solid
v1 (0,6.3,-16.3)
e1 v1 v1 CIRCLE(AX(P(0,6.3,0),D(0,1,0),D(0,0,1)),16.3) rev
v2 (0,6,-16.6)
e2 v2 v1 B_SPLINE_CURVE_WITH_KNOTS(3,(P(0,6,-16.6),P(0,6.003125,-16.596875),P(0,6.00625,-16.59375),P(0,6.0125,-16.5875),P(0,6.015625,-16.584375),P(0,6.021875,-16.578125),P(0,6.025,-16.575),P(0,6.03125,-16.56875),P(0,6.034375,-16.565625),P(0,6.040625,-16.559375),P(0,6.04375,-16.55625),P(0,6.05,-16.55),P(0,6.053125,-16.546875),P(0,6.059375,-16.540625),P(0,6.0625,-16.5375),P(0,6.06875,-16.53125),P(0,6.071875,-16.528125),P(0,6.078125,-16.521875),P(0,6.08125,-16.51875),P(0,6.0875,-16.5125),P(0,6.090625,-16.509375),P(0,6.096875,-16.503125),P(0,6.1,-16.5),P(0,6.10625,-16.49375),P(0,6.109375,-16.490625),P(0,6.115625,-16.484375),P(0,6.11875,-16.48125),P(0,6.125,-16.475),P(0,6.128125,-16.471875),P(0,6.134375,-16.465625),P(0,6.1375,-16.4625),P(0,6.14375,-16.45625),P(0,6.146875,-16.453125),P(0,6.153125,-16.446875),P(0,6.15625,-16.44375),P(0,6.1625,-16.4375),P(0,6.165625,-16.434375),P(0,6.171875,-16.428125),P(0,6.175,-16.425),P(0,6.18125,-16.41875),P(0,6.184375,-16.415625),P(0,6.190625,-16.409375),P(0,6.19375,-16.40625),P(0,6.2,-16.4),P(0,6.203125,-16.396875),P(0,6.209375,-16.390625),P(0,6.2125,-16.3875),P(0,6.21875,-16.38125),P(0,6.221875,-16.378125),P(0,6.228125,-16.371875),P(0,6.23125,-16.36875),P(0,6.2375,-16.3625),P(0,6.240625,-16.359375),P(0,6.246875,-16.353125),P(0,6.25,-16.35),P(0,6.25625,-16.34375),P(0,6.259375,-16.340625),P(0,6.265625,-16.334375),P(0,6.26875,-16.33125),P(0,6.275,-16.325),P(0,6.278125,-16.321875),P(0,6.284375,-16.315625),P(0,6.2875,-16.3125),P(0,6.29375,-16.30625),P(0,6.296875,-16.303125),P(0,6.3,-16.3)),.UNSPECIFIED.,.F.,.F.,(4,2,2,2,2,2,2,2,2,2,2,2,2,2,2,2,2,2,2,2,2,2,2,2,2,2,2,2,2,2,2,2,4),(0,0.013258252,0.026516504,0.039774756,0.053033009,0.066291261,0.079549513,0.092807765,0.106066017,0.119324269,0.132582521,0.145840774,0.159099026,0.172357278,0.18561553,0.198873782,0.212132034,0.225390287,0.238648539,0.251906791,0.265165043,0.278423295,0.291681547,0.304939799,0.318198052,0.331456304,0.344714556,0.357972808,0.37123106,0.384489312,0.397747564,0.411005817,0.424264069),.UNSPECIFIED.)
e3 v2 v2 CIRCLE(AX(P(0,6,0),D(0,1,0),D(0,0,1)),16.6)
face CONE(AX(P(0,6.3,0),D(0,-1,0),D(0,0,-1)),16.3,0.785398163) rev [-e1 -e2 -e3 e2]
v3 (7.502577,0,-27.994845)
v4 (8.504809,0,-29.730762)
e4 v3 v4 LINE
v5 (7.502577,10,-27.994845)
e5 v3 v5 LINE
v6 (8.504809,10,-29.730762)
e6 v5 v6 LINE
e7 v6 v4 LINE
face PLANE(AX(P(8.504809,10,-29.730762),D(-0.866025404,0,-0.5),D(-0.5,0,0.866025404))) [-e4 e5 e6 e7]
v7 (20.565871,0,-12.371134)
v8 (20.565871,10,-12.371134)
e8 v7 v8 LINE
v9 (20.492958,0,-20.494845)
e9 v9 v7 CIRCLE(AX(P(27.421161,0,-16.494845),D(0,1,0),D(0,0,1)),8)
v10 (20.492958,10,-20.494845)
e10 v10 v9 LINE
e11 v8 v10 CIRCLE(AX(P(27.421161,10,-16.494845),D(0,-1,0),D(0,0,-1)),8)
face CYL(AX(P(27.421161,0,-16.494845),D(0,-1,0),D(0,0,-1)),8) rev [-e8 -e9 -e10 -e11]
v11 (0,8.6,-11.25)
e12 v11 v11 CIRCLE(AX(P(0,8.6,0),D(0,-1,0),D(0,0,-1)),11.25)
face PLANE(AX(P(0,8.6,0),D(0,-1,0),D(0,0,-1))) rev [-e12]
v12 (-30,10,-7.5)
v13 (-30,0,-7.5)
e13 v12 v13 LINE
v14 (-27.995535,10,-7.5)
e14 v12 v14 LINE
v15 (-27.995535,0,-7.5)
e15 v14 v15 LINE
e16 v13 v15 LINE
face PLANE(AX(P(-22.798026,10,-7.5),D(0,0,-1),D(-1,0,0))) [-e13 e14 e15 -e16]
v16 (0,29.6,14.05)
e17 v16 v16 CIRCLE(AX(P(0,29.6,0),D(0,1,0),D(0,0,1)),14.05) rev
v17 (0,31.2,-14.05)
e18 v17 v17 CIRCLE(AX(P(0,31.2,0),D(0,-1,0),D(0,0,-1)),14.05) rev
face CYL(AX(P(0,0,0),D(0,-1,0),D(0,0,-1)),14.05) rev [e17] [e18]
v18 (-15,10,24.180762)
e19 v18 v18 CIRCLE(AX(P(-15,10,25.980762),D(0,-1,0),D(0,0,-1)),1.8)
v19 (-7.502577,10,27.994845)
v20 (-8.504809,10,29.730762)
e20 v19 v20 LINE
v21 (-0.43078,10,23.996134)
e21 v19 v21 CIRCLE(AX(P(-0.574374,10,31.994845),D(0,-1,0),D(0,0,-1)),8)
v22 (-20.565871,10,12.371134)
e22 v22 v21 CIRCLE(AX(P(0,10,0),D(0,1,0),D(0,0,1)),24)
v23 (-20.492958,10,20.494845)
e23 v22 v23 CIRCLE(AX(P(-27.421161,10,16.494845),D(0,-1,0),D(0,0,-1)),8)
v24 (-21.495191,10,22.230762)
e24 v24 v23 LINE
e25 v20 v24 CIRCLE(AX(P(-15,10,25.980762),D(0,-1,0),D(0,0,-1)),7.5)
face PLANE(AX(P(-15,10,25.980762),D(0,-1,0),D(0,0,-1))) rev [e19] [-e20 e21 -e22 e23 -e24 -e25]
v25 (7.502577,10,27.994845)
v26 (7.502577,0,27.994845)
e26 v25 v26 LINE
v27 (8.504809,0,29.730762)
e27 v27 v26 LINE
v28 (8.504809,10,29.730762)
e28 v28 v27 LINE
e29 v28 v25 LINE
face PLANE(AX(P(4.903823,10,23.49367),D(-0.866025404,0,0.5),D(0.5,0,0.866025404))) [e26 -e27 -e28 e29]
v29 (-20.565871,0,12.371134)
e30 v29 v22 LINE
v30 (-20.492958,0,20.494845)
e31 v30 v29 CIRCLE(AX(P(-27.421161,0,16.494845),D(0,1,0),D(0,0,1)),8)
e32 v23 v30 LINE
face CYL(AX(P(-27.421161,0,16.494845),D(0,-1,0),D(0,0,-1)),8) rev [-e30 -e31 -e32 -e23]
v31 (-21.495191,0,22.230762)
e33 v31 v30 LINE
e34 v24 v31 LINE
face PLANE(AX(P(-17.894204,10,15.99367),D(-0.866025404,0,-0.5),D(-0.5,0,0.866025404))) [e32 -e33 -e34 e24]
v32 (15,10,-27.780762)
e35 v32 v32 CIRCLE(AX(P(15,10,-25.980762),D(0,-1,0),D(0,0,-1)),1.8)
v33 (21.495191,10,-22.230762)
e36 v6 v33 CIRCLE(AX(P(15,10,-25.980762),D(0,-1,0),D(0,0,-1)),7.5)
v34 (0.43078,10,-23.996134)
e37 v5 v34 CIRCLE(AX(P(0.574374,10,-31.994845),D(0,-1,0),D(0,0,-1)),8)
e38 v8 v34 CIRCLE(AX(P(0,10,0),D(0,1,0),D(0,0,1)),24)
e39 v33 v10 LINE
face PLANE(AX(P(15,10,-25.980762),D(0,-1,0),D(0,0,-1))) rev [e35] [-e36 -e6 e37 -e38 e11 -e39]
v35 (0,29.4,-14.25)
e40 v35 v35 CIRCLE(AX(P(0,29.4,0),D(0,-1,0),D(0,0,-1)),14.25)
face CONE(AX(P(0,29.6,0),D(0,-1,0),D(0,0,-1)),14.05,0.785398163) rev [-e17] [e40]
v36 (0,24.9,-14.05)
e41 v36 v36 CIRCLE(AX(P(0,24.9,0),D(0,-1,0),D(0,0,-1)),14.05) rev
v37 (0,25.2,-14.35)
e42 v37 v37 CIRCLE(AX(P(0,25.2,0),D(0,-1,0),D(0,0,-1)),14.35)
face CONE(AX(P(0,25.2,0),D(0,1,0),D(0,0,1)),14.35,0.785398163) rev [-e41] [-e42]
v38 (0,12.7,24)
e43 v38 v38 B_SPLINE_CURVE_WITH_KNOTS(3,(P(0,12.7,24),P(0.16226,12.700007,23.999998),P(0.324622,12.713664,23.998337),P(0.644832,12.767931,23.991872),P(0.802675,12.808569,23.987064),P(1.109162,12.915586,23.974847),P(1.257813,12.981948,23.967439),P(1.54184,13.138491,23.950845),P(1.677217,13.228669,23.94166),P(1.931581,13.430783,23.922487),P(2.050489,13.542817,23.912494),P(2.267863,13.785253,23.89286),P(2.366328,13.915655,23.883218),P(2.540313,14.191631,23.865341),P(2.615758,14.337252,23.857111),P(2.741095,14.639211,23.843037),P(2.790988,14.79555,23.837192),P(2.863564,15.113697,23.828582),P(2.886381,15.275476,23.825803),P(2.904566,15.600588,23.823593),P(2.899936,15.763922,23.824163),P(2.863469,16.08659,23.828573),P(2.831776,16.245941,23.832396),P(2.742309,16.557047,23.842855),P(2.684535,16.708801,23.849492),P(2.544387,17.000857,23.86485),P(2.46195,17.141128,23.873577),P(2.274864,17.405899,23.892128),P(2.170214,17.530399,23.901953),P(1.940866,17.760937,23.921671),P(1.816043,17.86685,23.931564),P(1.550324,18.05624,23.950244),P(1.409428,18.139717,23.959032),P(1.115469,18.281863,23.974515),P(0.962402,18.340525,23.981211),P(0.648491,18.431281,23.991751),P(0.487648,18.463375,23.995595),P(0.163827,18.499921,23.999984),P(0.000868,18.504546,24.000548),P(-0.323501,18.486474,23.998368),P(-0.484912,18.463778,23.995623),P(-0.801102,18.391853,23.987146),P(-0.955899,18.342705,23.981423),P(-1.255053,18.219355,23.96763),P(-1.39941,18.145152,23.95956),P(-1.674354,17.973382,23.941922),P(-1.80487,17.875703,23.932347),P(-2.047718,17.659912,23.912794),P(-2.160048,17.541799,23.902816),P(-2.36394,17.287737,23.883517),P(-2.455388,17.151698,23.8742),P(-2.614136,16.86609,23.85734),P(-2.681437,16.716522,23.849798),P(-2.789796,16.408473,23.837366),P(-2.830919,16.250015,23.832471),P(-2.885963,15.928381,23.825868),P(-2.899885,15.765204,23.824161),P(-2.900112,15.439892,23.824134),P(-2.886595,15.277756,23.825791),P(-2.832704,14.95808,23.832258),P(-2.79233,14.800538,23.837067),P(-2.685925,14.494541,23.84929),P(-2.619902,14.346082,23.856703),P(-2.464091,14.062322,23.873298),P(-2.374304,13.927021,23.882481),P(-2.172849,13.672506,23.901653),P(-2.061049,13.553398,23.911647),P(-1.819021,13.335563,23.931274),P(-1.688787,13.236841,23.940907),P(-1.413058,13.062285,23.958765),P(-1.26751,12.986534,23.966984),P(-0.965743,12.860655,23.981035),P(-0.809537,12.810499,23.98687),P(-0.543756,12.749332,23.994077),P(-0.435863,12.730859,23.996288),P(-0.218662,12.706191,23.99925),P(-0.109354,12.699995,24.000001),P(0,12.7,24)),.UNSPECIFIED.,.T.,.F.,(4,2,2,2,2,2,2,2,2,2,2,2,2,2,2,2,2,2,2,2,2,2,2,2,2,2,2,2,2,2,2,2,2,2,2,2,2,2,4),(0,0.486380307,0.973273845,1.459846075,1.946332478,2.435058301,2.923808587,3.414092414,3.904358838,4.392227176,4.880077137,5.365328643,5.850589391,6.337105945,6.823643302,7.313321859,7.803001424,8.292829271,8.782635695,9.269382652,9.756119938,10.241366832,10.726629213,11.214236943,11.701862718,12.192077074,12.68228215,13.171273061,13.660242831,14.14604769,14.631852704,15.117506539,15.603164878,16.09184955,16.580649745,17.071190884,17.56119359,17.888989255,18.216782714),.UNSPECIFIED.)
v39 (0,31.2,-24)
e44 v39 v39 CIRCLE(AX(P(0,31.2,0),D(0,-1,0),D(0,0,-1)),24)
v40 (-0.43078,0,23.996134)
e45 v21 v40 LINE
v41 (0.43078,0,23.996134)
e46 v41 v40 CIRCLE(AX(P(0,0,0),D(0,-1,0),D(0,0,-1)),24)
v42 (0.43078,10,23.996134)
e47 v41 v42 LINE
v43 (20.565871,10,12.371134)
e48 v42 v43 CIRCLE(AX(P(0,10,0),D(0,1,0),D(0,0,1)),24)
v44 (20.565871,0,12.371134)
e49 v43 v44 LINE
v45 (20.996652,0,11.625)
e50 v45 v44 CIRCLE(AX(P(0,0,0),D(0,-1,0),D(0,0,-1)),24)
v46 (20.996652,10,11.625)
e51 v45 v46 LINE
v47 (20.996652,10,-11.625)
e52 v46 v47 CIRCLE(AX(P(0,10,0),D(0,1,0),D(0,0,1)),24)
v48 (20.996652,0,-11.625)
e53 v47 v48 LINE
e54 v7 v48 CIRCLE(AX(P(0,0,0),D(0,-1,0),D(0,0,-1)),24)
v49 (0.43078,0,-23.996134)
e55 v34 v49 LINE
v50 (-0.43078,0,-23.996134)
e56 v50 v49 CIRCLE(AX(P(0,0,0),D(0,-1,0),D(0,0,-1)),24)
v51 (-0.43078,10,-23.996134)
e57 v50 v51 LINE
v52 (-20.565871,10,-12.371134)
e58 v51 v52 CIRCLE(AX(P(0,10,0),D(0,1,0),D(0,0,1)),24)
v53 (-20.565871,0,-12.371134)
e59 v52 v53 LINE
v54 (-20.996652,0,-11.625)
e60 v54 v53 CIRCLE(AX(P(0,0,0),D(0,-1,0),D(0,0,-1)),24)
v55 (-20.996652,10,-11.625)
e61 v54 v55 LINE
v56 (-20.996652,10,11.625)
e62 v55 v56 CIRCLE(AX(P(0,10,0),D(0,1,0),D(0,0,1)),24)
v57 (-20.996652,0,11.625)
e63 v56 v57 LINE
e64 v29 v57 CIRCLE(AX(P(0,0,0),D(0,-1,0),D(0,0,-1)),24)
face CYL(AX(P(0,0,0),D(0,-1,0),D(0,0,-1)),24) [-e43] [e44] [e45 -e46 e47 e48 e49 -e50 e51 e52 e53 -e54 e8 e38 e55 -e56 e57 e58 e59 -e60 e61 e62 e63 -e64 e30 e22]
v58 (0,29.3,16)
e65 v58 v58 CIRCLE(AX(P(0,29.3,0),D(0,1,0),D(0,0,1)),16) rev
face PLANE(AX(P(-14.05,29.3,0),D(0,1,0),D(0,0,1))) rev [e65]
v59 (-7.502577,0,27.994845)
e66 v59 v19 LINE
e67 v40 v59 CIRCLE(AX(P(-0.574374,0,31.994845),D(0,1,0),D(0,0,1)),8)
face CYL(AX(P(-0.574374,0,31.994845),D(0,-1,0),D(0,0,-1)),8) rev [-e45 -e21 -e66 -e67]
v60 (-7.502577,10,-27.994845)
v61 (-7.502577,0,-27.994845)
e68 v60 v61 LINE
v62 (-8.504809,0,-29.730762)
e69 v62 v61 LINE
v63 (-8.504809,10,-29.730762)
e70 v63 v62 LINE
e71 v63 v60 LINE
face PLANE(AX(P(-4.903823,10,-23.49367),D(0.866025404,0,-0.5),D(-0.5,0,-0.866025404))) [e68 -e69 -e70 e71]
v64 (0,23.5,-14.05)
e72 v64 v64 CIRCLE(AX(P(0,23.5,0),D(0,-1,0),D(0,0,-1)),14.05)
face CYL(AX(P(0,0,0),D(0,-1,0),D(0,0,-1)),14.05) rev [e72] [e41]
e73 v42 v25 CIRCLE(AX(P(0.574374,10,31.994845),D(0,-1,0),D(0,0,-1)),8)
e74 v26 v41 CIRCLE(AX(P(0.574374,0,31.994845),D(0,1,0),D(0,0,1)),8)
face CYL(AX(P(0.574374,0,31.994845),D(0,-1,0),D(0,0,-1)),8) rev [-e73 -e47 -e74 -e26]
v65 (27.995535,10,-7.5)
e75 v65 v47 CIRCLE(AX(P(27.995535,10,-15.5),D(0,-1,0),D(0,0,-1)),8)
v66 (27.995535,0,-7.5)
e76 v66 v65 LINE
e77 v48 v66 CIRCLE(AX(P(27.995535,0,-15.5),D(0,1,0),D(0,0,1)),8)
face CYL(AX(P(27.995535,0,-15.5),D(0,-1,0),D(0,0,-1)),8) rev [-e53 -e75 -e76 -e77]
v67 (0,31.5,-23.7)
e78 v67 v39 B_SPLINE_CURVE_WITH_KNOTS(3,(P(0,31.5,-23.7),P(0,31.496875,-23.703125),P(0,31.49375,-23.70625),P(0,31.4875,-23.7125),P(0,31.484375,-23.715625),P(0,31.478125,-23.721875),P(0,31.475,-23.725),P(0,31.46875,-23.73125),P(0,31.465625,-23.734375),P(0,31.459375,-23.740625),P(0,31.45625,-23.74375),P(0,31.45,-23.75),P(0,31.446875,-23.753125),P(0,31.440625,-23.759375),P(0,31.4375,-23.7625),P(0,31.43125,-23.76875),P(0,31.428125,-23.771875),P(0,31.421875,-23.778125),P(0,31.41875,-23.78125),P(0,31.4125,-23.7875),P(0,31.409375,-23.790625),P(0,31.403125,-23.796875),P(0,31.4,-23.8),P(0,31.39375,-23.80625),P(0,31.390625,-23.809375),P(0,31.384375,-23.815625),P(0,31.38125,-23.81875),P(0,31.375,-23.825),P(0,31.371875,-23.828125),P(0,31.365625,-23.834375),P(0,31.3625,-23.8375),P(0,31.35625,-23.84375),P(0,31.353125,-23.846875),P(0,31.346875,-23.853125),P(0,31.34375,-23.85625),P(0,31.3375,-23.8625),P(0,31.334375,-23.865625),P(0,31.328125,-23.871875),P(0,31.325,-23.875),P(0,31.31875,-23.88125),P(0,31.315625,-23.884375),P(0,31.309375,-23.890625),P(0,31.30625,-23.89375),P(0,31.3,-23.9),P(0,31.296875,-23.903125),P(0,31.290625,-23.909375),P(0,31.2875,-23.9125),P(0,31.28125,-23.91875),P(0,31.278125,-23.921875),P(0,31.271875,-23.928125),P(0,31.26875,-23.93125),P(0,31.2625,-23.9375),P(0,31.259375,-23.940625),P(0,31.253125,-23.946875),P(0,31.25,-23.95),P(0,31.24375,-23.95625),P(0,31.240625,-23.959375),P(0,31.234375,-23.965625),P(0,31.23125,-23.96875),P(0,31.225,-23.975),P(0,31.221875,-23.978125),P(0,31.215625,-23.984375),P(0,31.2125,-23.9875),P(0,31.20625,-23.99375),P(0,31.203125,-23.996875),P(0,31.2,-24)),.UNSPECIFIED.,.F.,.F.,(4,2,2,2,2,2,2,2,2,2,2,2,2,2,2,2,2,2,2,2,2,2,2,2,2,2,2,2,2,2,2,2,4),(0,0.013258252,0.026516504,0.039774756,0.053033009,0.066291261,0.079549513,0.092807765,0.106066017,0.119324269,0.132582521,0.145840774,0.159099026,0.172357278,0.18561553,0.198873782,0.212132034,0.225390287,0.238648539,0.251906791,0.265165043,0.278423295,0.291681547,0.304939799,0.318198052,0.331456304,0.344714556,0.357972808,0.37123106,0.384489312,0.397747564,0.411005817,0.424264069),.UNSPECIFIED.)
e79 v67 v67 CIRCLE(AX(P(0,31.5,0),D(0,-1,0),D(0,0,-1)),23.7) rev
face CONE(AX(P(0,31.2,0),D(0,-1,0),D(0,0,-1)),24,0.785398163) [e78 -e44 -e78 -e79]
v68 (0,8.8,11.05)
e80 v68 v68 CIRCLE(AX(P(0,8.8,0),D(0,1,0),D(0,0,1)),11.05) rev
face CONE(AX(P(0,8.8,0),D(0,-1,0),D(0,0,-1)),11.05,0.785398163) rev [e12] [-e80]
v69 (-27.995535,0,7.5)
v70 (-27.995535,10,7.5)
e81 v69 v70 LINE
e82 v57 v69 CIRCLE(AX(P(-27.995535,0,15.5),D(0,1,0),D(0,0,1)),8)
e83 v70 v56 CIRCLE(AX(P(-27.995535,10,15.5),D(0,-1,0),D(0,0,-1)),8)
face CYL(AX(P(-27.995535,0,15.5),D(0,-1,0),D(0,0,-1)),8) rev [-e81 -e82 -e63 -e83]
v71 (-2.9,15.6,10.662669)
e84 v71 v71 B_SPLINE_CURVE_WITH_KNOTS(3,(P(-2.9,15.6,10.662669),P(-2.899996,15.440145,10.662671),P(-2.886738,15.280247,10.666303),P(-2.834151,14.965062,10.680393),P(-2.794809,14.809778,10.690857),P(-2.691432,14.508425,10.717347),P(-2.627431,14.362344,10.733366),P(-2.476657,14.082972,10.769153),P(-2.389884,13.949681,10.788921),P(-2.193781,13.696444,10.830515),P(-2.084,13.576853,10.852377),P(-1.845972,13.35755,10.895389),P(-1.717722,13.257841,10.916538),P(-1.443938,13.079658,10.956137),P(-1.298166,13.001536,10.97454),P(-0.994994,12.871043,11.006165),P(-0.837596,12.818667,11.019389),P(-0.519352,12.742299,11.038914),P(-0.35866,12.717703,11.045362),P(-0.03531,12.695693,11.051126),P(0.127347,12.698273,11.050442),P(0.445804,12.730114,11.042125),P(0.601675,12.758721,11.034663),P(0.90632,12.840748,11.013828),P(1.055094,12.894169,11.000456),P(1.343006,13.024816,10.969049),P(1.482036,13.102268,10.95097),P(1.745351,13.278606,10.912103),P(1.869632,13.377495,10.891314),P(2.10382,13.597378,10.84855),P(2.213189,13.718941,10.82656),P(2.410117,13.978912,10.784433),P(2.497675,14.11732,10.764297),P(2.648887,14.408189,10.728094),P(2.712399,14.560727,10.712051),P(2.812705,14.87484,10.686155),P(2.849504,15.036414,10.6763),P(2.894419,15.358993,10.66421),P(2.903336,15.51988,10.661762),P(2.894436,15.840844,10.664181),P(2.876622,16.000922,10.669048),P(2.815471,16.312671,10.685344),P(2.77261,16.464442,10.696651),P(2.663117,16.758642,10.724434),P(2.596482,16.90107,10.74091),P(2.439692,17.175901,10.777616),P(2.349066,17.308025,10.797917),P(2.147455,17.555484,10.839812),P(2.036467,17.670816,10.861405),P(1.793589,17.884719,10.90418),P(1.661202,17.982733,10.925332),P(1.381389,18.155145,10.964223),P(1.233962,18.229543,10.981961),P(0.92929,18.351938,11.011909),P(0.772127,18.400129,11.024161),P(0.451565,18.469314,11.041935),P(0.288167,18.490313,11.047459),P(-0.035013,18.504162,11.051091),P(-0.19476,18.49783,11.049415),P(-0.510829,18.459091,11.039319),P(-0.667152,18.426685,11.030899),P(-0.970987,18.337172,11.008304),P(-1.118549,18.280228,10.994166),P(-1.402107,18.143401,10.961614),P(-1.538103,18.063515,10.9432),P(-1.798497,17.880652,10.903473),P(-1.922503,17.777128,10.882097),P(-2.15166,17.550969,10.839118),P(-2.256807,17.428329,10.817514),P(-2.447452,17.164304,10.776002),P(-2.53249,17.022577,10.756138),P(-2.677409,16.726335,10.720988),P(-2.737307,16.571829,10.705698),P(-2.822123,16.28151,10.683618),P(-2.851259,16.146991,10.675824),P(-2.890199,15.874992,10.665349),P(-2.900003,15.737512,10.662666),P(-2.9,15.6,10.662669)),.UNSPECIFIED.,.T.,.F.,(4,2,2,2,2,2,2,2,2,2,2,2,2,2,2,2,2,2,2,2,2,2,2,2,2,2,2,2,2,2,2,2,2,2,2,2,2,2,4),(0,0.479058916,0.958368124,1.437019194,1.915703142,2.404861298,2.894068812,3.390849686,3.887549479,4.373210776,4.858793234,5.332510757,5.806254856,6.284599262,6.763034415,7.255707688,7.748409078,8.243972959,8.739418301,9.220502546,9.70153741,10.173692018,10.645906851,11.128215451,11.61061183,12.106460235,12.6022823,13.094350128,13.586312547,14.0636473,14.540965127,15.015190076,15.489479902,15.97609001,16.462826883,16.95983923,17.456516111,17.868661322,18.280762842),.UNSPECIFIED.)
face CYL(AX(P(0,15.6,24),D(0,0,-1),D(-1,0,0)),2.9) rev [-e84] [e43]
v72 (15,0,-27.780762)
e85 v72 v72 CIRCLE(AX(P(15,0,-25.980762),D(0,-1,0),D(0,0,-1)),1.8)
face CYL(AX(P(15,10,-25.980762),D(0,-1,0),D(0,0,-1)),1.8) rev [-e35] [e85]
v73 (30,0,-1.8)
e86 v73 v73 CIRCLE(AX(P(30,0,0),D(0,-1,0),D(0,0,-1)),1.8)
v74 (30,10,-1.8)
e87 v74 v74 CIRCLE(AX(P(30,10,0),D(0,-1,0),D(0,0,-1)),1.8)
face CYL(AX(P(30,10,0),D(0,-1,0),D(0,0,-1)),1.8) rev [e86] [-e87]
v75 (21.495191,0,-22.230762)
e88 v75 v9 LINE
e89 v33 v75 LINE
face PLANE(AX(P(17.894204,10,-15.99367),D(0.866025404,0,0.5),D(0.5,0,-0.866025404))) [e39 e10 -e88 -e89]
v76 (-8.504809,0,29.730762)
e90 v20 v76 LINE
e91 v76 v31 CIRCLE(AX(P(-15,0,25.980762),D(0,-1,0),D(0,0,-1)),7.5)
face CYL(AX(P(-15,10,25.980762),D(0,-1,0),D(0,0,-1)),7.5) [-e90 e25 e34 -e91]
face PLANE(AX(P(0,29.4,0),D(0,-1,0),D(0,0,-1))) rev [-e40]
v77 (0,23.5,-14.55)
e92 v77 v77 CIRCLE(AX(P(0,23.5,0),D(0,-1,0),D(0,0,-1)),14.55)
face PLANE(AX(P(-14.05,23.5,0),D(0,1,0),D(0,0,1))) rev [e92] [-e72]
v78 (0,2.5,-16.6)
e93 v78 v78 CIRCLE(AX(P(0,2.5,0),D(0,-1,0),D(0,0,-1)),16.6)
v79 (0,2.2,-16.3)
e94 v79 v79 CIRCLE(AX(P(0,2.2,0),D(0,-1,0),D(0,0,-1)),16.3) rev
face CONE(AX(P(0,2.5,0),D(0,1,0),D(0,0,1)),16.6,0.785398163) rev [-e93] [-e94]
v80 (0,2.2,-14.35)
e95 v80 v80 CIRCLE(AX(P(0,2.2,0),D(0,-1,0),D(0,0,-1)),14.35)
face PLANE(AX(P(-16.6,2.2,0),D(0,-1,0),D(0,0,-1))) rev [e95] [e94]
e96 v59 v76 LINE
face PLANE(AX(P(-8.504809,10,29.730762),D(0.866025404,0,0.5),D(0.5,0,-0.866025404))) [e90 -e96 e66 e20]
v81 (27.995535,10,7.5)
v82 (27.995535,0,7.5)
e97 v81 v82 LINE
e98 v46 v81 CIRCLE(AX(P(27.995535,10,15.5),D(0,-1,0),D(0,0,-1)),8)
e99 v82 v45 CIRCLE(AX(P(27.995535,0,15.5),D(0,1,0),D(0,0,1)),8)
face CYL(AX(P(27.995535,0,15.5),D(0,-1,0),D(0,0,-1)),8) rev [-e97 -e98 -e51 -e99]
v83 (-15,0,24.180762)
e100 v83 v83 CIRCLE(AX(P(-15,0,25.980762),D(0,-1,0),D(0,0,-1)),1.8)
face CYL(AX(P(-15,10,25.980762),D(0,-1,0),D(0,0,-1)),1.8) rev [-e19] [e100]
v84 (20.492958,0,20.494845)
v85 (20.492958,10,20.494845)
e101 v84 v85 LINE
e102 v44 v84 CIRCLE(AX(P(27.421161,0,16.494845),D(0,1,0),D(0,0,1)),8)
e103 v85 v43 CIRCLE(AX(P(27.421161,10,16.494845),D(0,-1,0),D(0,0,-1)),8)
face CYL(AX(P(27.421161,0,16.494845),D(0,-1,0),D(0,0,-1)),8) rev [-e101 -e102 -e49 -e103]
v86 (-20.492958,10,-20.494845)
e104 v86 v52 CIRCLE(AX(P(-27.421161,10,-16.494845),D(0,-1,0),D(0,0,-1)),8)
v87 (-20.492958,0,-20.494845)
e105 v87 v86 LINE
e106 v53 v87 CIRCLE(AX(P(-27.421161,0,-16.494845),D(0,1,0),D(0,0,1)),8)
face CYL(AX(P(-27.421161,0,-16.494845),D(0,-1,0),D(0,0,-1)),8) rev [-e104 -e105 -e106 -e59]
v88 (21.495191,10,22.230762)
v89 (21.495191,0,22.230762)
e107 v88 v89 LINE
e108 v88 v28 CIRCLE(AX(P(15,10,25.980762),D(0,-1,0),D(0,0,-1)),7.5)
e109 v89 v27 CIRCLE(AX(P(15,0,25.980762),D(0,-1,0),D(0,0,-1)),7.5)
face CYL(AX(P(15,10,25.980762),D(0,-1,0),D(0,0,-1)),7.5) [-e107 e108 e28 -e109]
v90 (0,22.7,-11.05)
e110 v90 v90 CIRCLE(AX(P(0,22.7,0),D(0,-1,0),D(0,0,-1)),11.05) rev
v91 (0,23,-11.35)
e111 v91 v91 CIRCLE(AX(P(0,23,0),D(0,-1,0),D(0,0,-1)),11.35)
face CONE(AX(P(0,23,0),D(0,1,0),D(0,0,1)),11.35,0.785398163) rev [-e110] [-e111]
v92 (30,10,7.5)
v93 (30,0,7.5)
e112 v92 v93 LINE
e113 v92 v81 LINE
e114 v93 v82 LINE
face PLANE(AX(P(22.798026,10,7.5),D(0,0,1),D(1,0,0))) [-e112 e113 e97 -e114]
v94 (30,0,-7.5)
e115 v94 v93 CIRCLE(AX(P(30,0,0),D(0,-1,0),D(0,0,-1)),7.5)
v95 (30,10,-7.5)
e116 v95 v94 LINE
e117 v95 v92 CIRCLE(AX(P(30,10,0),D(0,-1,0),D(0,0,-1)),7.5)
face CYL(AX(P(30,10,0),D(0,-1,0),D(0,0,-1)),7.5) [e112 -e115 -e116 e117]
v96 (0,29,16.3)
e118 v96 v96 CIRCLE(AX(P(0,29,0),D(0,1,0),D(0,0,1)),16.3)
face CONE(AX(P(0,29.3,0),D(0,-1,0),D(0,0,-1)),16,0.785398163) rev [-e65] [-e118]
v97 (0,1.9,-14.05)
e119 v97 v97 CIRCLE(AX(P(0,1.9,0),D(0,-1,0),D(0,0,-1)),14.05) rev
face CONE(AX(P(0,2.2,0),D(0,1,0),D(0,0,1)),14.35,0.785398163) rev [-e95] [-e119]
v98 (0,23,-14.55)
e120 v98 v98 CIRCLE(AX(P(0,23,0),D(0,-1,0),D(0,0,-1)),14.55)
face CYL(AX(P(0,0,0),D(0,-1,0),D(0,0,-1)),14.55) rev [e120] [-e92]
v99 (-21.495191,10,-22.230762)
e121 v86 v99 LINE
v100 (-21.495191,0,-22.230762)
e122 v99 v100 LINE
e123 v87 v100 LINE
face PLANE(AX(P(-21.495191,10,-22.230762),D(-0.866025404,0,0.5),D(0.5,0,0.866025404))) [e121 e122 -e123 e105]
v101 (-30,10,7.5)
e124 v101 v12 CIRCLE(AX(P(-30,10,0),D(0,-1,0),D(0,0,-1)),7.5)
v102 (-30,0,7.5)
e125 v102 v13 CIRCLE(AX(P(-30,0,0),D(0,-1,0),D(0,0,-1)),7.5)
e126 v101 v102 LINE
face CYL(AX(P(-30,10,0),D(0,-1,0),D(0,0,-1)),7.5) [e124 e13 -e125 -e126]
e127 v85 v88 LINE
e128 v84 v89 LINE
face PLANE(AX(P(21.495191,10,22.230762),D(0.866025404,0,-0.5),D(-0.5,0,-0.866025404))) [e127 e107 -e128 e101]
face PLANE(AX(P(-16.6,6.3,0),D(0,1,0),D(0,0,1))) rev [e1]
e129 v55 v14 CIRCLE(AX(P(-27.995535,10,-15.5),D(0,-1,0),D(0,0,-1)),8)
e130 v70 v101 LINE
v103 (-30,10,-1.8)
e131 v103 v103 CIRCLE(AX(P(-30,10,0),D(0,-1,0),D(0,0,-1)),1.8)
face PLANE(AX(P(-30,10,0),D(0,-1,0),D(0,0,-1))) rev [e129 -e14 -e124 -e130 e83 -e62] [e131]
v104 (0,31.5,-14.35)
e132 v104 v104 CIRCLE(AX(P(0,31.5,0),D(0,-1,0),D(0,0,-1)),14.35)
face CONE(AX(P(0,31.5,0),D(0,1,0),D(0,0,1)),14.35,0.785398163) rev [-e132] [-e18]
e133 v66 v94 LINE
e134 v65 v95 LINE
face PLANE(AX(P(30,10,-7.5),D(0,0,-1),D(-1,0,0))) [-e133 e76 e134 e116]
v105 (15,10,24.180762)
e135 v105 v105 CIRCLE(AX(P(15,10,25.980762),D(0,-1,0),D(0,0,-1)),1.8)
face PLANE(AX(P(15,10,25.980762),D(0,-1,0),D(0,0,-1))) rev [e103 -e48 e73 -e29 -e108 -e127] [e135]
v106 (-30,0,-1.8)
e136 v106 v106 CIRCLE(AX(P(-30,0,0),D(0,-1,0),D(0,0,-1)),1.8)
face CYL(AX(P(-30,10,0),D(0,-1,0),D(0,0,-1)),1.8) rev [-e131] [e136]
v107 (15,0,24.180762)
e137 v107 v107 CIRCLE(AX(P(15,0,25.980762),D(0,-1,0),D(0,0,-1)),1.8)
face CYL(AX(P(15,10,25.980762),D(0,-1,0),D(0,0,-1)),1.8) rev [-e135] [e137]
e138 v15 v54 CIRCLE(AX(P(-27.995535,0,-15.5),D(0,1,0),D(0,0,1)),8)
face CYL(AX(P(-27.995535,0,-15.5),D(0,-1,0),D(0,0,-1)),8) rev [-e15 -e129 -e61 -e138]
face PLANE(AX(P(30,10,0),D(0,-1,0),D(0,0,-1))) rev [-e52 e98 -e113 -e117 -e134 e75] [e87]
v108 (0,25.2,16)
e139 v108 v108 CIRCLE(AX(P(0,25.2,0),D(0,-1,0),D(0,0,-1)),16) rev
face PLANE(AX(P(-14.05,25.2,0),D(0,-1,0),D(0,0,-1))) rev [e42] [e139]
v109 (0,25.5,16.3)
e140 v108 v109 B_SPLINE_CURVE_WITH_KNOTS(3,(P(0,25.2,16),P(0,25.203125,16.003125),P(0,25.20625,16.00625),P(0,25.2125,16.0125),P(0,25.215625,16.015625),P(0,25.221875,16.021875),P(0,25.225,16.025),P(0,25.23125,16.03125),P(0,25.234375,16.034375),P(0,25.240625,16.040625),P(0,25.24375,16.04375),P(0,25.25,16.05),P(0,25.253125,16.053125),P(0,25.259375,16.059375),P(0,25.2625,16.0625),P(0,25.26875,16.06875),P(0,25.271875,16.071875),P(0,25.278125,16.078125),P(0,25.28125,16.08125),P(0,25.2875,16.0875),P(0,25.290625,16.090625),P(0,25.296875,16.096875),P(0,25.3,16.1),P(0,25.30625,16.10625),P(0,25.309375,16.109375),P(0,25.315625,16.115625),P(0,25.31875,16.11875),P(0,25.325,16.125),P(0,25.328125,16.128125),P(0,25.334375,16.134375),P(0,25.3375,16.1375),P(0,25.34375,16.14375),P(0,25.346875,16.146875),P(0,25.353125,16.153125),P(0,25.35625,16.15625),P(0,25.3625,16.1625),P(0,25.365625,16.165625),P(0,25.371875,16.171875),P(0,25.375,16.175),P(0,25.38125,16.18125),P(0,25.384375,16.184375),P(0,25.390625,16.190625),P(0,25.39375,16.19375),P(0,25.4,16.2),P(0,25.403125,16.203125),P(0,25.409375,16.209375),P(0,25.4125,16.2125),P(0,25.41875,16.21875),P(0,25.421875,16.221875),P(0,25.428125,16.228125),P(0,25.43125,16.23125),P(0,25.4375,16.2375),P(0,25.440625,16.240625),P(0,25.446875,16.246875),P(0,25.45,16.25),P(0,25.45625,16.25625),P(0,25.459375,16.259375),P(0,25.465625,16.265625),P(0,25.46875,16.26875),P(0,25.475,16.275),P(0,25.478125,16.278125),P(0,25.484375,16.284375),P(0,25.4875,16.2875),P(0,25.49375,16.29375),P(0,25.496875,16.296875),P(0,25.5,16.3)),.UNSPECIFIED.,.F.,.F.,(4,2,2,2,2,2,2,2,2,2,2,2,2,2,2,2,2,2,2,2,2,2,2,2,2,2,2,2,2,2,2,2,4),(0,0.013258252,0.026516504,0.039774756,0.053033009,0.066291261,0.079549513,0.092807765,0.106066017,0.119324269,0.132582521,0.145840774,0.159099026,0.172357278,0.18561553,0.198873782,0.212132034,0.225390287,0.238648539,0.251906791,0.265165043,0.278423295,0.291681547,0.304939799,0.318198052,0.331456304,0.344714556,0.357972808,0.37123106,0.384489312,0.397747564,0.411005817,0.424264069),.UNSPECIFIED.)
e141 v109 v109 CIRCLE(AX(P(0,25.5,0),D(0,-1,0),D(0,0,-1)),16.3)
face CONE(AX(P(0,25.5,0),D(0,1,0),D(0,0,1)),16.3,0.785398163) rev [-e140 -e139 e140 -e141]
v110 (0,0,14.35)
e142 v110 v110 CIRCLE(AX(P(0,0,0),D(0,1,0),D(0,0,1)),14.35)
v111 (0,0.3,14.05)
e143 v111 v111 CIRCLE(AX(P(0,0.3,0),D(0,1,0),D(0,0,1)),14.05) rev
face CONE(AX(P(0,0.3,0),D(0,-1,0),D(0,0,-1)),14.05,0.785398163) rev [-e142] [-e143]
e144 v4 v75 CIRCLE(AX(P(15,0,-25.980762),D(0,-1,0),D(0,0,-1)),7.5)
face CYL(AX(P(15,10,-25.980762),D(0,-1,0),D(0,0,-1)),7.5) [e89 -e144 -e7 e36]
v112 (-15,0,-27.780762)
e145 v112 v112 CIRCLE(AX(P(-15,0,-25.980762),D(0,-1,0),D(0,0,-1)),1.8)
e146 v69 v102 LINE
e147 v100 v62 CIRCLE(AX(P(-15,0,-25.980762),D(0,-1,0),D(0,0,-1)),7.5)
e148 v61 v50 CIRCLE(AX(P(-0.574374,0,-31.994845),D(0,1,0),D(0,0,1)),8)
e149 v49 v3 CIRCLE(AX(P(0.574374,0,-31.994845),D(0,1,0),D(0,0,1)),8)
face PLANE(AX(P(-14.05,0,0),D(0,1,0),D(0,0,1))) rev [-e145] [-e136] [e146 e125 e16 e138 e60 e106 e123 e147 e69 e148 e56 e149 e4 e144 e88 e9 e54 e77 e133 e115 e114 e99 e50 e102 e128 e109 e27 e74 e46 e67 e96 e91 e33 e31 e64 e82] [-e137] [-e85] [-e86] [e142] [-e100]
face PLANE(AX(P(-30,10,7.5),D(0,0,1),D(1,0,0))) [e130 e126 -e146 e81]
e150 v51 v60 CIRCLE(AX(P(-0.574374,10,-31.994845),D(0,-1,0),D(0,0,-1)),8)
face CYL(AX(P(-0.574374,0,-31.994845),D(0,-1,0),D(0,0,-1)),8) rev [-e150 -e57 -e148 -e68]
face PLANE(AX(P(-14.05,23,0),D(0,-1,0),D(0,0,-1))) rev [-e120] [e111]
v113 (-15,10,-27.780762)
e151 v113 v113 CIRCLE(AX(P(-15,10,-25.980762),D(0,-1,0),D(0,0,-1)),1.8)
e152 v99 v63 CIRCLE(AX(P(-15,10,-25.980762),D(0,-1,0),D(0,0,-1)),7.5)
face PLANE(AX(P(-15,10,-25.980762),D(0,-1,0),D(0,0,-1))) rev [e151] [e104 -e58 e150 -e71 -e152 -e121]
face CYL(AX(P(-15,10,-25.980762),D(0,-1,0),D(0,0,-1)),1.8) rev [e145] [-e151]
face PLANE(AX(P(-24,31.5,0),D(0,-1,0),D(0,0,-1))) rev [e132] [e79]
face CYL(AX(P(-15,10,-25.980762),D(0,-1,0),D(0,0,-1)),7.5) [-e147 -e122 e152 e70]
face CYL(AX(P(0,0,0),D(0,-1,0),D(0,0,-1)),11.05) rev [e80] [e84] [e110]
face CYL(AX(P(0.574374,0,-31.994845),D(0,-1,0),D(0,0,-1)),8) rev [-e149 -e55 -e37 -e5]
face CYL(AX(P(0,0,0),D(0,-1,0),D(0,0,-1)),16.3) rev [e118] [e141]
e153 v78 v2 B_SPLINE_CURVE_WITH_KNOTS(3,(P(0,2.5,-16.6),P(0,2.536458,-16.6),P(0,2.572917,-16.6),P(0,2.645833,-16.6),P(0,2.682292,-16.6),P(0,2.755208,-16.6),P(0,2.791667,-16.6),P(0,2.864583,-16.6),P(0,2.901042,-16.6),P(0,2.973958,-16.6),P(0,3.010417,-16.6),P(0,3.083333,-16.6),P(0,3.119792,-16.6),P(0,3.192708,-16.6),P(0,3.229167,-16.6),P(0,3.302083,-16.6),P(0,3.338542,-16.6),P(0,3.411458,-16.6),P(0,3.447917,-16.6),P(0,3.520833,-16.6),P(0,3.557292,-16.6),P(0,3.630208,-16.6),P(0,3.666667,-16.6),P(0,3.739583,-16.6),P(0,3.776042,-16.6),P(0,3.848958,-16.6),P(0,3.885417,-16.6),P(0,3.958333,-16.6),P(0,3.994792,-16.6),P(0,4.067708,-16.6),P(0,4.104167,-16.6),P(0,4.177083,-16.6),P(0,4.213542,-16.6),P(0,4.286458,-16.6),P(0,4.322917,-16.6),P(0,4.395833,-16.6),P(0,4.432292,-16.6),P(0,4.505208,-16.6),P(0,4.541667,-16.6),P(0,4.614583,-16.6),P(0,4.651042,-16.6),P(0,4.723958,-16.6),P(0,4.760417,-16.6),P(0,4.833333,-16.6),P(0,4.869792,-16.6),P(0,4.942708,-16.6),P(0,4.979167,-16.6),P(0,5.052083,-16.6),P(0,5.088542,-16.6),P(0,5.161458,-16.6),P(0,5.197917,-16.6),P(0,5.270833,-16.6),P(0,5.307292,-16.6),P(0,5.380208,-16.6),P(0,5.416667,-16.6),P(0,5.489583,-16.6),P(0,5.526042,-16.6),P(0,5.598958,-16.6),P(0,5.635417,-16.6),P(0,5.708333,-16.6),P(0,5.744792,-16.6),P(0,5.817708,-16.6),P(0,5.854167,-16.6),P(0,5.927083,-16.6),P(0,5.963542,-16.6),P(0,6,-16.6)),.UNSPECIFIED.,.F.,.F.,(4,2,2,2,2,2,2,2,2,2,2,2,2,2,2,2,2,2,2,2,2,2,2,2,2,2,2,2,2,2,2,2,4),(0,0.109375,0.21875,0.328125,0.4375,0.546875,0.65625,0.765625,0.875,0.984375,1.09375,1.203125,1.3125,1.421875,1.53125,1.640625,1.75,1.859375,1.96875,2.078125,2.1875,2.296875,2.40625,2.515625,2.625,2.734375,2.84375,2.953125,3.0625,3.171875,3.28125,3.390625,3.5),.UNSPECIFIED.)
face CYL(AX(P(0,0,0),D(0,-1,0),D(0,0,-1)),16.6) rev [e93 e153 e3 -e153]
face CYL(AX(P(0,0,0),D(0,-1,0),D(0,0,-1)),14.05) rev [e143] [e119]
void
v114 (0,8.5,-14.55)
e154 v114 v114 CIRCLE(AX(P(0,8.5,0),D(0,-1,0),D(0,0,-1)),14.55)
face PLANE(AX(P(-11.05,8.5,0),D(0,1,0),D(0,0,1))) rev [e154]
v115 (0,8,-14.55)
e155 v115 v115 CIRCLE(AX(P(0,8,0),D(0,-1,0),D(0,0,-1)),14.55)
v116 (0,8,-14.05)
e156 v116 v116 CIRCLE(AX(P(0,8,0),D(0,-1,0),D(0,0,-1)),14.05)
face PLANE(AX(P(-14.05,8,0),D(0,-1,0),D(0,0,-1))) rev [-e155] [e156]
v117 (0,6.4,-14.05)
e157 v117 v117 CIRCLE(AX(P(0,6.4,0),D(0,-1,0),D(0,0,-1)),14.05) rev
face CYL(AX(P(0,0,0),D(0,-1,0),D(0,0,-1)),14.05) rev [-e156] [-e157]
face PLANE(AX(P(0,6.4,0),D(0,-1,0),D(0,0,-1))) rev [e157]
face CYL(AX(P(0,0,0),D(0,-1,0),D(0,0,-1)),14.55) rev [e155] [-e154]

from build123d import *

# Parameters (mm, degrees)
CHAMFER1_SIZE          = 0.3
CUT_EXTRUDE4_START     = 10.66266842
CUT_EXTRUDE4_OUTLINE_R = 2.9
CUT_EXTRUDE4_DEPTH     = 13.33733168
BOSS_EXTRUDE1_START    = -10
SKETCH10_R             = 1.8
BOSS_EXTRUDE1_DEPTH    = 10
FILLET1_R              = 8
SKETCH11_R             = 14.05
BOSS_EXTRUDE2_DEPTH    = 0.1
SKETCH12_R             = 21.35
BOSS_EXTRUDE3_DEPTH    = 0.1
SKETCH13_R             = 14.35
BOSS_EXTRUDE4_DEPTH    = 0.1


# Read off the part's stored shape, not the designer's step: Cut-Extrude4
with BuildPart() as part:
    # Sketch1 → Revolve1 (revolve)
    with BuildSketch(Plane.XY, mode=Mode.PRIVATE) as revolve1_sk:
        Polygon((-14.05, 0), (-24, 0), (-24, 31.5), (-14.05, 31.5), (-14.05, 29.3), (-16.3, 29.3), (-16.3, 25.2), (-14.05, 25.2), (-14.05, 23.5), (-14.55, 23.5), (-14.55, 23), (-14.05, 23), (-11.05, 23), (-11.05, 8.5), (-14.05, 8.5), (-14.55, 8.5), (-14.55, 8), (-14.05, 8), (-14.05, 6.3), (-16.6, 6.3), (-16.6, 2.2), (-14.05, 2.2), align=None)
    revolve(revolve1_sk.sketch.rotate(Axis((0, 0, 0), (0, 1, 0)), 270), axis=Axis((0, 0, 0), (0, 1, 0)))

    # Chamfer1
    chamfer1_edges = [part.edges().sort_by_distance(p)[0] for p in [
        (0, 2.2, 16.6),
        (0, 2.2, 14.05),
        (0, 0, 14.05),
        (0, 31.5, 24),
        (0, 31.5, 14.05),
        (0, 29.3, 14.05),
        (0, 29.3, 16.3),
        (0, 25.2, 16.3),
        (0, 25.2, 14.05),
        (0, 23, 11.05),
        (0, 8.5, 11.05),
        (0, 6.3, 16.6),
    ]]
    chamfer(chamfer1_edges, length=CHAMFER1_SIZE)

    # Cut-Extrude4 outline → Cut-Extrude4 (cut)
    with BuildSketch(Plane.XY.offset(CUT_EXTRUDE4_START)):
        with Locations((0, 15.6)):
            Circle(CUT_EXTRUDE4_OUTLINE_R)
    extrude(amount=CUT_EXTRUDE4_DEPTH, mode=Mode.SUBTRACT)

    # Sketch10 → Boss-Extrude1 (add)
    # profile 1 of 6: a face of its own
    with BuildSketch(Plane.XZ.offset(BOSS_EXTRUDE1_START)):
        with BuildLine():
            Line((-30, 7.5), (-22.79802623, 7.5))
            ThreePointArc((-22.79802623, 7.5), (-24, 0), (-22.79802623, -7.5))
            Line((-22.79802623, -7.5), (-30, -7.5))
            ThreePointArc((-30, -7.5), (-37.5, 0), (-30, 7.5))
        make_face()
        with Locations(Location((-30, 0, 0), (0, 0, 270))):
            Circle(SKETCH10_R, mode=Mode.SUBTRACT)
    # profile 2 of 6: a face of its own
    with BuildSketch(Plane.XZ.offset(BOSS_EXTRUDE1_START)):
        with BuildLine():
            Line((-8.504809472, 29.730762114), (-4.903822587, 23.493669872))
            ThreePointArc((-4.903822587, 23.493669872), (-12, 20.784609691), (-17.894203644, 15.993669872))
            Line((-17.894203644, 15.993669872), (-21.495190528, 22.230762114))
            ThreePointArc((-21.495190528, 22.230762114), (-18.75, 32.475952642), (-8.504809472, 29.730762114))
        make_face()
        with Locations(Location((-15, 25.980762114, 0), (0, 0, 270))):
            Circle(SKETCH10_R, mode=Mode.SUBTRACT)
    # profile 3 of 6: a face of its own
    with BuildSketch(Plane.XZ.offset(BOSS_EXTRUDE1_START)):
        with BuildLine():
            Line((21.495190528, 22.230762114), (17.894203644, 15.993669872))
            ThreePointArc((17.894203644, 15.993669872), (12, 20.784609691), (4.903822587, 23.493669872))
            Line((4.903822587, 23.493669872), (8.504809472, 29.730762114))
            ThreePointArc((8.504809472, 29.730762114), (18.75, 32.475952642), (21.495190528, 22.230762114))
        make_face()
        with Locations(Location((15, 25.980762114, 0), (0, 0, 270))):
            Circle(SKETCH10_R, mode=Mode.SUBTRACT)
    # profile 4 of 6: a face of its own
    with BuildSketch(Plane.XZ.offset(BOSS_EXTRUDE1_START)):
        with BuildLine():
            Line((30, -7.5), (22.79802623, -7.5))
            ThreePointArc((22.79802623, -7.5), (24, 0), (22.79802623, 7.5))
            Line((22.79802623, 7.5), (30, 7.5))
            ThreePointArc((30, 7.5), (37.5, 0), (30, -7.5))
        make_face()
        with Locations(Location((30, 0, 0), (0, 0, 270))):
            Circle(SKETCH10_R, mode=Mode.SUBTRACT)
    # profile 5 of 6: a face of its own
    with BuildSketch(Plane.XZ.offset(BOSS_EXTRUDE1_START)):
        with BuildLine():
            Line((8.504809472, -29.730762114), (4.903822587, -23.493669872))
            ThreePointArc((4.903822587, -23.493669872), (12, -20.784609691), (17.894203644, -15.993669872))
            Line((17.894203644, -15.993669872), (21.495190528, -22.230762114))
            ThreePointArc((21.495190528, -22.230762114), (18.75, -32.475952642), (8.504809472, -29.730762114))
        make_face()
        with Locations(Location((15, -25.980762114, 0), (0, 0, 270))):
            Circle(SKETCH10_R, mode=Mode.SUBTRACT)
    # profile 6 of 6: a face of its own
    with BuildSketch(Plane.XZ.offset(BOSS_EXTRUDE1_START)):
        with BuildLine():
            Line((-21.495190528, -22.230762114), (-17.894203644, -15.993669872))
            ThreePointArc((-17.894203644, -15.993669872), (-12, -20.784609691), (-4.903822587, -23.493669872))
            Line((-4.903822587, -23.493669872), (-8.504809472, -29.730762114))
            ThreePointArc((-8.504809472, -29.730762114), (-18.75, -32.475952642), (-21.495190528, -22.230762114))
        make_face()
        with Locations(Location((-15, -25.980762114, 0), (0, 0, 270))):
            Circle(SKETCH10_R, mode=Mode.SUBTRACT)
    extrude(amount=BOSS_EXTRUDE1_DEPTH)

    # Fillet1
    fillet1_edges = [part.edges().sort_by_distance(p)[0] for p in [
        (-4.903822587, 5, 23.493669872),
        (-17.894203644, 5, 15.993669872),
        (17.894203644, 5, 15.993669872),
        (4.903822587, 5, 23.493669872),
        (22.79802623, 5, -7.5),
        (22.79802623, 5, 7.5),
        (4.903822587, 5, -23.493669872),
        (17.894203644, 5, -15.993669872),
        (-17.894203644, 5, -15.993669872),
        (-4.903822587, 5, -23.493669872),
        (-22.79802623, 5, 7.5),
        (-22.79802623, 5, -7.5),
    ]]
    fillet(fillet1_edges, radius=FILLET1_R)

    # Sketch11 → Boss-Extrude2 (add)
    with BuildSketch(Plane.XZ.offset(-6.3)):
        with Locations(Location((0, 0, 0), (0, 0, 270))):
            Circle(SKETCH11_R)
    extrude(amount=-BOSS_EXTRUDE2_DEPTH)

    # Sketch12 → Boss-Extrude3 (add)
    with BuildSketch(Plane.XZ.offset(-8.5)):
        Circle(SKETCH12_R)
    extrude(amount=-BOSS_EXTRUDE3_DEPTH)

    # Sketch13 → Boss-Extrude4 (add)
    with BuildSketch(Plane.XZ.offset(-29.3)):
        Circle(SKETCH13_R)
    extrude(amount=-BOSS_EXTRUDE4_DEPTH)


solid = part.part
